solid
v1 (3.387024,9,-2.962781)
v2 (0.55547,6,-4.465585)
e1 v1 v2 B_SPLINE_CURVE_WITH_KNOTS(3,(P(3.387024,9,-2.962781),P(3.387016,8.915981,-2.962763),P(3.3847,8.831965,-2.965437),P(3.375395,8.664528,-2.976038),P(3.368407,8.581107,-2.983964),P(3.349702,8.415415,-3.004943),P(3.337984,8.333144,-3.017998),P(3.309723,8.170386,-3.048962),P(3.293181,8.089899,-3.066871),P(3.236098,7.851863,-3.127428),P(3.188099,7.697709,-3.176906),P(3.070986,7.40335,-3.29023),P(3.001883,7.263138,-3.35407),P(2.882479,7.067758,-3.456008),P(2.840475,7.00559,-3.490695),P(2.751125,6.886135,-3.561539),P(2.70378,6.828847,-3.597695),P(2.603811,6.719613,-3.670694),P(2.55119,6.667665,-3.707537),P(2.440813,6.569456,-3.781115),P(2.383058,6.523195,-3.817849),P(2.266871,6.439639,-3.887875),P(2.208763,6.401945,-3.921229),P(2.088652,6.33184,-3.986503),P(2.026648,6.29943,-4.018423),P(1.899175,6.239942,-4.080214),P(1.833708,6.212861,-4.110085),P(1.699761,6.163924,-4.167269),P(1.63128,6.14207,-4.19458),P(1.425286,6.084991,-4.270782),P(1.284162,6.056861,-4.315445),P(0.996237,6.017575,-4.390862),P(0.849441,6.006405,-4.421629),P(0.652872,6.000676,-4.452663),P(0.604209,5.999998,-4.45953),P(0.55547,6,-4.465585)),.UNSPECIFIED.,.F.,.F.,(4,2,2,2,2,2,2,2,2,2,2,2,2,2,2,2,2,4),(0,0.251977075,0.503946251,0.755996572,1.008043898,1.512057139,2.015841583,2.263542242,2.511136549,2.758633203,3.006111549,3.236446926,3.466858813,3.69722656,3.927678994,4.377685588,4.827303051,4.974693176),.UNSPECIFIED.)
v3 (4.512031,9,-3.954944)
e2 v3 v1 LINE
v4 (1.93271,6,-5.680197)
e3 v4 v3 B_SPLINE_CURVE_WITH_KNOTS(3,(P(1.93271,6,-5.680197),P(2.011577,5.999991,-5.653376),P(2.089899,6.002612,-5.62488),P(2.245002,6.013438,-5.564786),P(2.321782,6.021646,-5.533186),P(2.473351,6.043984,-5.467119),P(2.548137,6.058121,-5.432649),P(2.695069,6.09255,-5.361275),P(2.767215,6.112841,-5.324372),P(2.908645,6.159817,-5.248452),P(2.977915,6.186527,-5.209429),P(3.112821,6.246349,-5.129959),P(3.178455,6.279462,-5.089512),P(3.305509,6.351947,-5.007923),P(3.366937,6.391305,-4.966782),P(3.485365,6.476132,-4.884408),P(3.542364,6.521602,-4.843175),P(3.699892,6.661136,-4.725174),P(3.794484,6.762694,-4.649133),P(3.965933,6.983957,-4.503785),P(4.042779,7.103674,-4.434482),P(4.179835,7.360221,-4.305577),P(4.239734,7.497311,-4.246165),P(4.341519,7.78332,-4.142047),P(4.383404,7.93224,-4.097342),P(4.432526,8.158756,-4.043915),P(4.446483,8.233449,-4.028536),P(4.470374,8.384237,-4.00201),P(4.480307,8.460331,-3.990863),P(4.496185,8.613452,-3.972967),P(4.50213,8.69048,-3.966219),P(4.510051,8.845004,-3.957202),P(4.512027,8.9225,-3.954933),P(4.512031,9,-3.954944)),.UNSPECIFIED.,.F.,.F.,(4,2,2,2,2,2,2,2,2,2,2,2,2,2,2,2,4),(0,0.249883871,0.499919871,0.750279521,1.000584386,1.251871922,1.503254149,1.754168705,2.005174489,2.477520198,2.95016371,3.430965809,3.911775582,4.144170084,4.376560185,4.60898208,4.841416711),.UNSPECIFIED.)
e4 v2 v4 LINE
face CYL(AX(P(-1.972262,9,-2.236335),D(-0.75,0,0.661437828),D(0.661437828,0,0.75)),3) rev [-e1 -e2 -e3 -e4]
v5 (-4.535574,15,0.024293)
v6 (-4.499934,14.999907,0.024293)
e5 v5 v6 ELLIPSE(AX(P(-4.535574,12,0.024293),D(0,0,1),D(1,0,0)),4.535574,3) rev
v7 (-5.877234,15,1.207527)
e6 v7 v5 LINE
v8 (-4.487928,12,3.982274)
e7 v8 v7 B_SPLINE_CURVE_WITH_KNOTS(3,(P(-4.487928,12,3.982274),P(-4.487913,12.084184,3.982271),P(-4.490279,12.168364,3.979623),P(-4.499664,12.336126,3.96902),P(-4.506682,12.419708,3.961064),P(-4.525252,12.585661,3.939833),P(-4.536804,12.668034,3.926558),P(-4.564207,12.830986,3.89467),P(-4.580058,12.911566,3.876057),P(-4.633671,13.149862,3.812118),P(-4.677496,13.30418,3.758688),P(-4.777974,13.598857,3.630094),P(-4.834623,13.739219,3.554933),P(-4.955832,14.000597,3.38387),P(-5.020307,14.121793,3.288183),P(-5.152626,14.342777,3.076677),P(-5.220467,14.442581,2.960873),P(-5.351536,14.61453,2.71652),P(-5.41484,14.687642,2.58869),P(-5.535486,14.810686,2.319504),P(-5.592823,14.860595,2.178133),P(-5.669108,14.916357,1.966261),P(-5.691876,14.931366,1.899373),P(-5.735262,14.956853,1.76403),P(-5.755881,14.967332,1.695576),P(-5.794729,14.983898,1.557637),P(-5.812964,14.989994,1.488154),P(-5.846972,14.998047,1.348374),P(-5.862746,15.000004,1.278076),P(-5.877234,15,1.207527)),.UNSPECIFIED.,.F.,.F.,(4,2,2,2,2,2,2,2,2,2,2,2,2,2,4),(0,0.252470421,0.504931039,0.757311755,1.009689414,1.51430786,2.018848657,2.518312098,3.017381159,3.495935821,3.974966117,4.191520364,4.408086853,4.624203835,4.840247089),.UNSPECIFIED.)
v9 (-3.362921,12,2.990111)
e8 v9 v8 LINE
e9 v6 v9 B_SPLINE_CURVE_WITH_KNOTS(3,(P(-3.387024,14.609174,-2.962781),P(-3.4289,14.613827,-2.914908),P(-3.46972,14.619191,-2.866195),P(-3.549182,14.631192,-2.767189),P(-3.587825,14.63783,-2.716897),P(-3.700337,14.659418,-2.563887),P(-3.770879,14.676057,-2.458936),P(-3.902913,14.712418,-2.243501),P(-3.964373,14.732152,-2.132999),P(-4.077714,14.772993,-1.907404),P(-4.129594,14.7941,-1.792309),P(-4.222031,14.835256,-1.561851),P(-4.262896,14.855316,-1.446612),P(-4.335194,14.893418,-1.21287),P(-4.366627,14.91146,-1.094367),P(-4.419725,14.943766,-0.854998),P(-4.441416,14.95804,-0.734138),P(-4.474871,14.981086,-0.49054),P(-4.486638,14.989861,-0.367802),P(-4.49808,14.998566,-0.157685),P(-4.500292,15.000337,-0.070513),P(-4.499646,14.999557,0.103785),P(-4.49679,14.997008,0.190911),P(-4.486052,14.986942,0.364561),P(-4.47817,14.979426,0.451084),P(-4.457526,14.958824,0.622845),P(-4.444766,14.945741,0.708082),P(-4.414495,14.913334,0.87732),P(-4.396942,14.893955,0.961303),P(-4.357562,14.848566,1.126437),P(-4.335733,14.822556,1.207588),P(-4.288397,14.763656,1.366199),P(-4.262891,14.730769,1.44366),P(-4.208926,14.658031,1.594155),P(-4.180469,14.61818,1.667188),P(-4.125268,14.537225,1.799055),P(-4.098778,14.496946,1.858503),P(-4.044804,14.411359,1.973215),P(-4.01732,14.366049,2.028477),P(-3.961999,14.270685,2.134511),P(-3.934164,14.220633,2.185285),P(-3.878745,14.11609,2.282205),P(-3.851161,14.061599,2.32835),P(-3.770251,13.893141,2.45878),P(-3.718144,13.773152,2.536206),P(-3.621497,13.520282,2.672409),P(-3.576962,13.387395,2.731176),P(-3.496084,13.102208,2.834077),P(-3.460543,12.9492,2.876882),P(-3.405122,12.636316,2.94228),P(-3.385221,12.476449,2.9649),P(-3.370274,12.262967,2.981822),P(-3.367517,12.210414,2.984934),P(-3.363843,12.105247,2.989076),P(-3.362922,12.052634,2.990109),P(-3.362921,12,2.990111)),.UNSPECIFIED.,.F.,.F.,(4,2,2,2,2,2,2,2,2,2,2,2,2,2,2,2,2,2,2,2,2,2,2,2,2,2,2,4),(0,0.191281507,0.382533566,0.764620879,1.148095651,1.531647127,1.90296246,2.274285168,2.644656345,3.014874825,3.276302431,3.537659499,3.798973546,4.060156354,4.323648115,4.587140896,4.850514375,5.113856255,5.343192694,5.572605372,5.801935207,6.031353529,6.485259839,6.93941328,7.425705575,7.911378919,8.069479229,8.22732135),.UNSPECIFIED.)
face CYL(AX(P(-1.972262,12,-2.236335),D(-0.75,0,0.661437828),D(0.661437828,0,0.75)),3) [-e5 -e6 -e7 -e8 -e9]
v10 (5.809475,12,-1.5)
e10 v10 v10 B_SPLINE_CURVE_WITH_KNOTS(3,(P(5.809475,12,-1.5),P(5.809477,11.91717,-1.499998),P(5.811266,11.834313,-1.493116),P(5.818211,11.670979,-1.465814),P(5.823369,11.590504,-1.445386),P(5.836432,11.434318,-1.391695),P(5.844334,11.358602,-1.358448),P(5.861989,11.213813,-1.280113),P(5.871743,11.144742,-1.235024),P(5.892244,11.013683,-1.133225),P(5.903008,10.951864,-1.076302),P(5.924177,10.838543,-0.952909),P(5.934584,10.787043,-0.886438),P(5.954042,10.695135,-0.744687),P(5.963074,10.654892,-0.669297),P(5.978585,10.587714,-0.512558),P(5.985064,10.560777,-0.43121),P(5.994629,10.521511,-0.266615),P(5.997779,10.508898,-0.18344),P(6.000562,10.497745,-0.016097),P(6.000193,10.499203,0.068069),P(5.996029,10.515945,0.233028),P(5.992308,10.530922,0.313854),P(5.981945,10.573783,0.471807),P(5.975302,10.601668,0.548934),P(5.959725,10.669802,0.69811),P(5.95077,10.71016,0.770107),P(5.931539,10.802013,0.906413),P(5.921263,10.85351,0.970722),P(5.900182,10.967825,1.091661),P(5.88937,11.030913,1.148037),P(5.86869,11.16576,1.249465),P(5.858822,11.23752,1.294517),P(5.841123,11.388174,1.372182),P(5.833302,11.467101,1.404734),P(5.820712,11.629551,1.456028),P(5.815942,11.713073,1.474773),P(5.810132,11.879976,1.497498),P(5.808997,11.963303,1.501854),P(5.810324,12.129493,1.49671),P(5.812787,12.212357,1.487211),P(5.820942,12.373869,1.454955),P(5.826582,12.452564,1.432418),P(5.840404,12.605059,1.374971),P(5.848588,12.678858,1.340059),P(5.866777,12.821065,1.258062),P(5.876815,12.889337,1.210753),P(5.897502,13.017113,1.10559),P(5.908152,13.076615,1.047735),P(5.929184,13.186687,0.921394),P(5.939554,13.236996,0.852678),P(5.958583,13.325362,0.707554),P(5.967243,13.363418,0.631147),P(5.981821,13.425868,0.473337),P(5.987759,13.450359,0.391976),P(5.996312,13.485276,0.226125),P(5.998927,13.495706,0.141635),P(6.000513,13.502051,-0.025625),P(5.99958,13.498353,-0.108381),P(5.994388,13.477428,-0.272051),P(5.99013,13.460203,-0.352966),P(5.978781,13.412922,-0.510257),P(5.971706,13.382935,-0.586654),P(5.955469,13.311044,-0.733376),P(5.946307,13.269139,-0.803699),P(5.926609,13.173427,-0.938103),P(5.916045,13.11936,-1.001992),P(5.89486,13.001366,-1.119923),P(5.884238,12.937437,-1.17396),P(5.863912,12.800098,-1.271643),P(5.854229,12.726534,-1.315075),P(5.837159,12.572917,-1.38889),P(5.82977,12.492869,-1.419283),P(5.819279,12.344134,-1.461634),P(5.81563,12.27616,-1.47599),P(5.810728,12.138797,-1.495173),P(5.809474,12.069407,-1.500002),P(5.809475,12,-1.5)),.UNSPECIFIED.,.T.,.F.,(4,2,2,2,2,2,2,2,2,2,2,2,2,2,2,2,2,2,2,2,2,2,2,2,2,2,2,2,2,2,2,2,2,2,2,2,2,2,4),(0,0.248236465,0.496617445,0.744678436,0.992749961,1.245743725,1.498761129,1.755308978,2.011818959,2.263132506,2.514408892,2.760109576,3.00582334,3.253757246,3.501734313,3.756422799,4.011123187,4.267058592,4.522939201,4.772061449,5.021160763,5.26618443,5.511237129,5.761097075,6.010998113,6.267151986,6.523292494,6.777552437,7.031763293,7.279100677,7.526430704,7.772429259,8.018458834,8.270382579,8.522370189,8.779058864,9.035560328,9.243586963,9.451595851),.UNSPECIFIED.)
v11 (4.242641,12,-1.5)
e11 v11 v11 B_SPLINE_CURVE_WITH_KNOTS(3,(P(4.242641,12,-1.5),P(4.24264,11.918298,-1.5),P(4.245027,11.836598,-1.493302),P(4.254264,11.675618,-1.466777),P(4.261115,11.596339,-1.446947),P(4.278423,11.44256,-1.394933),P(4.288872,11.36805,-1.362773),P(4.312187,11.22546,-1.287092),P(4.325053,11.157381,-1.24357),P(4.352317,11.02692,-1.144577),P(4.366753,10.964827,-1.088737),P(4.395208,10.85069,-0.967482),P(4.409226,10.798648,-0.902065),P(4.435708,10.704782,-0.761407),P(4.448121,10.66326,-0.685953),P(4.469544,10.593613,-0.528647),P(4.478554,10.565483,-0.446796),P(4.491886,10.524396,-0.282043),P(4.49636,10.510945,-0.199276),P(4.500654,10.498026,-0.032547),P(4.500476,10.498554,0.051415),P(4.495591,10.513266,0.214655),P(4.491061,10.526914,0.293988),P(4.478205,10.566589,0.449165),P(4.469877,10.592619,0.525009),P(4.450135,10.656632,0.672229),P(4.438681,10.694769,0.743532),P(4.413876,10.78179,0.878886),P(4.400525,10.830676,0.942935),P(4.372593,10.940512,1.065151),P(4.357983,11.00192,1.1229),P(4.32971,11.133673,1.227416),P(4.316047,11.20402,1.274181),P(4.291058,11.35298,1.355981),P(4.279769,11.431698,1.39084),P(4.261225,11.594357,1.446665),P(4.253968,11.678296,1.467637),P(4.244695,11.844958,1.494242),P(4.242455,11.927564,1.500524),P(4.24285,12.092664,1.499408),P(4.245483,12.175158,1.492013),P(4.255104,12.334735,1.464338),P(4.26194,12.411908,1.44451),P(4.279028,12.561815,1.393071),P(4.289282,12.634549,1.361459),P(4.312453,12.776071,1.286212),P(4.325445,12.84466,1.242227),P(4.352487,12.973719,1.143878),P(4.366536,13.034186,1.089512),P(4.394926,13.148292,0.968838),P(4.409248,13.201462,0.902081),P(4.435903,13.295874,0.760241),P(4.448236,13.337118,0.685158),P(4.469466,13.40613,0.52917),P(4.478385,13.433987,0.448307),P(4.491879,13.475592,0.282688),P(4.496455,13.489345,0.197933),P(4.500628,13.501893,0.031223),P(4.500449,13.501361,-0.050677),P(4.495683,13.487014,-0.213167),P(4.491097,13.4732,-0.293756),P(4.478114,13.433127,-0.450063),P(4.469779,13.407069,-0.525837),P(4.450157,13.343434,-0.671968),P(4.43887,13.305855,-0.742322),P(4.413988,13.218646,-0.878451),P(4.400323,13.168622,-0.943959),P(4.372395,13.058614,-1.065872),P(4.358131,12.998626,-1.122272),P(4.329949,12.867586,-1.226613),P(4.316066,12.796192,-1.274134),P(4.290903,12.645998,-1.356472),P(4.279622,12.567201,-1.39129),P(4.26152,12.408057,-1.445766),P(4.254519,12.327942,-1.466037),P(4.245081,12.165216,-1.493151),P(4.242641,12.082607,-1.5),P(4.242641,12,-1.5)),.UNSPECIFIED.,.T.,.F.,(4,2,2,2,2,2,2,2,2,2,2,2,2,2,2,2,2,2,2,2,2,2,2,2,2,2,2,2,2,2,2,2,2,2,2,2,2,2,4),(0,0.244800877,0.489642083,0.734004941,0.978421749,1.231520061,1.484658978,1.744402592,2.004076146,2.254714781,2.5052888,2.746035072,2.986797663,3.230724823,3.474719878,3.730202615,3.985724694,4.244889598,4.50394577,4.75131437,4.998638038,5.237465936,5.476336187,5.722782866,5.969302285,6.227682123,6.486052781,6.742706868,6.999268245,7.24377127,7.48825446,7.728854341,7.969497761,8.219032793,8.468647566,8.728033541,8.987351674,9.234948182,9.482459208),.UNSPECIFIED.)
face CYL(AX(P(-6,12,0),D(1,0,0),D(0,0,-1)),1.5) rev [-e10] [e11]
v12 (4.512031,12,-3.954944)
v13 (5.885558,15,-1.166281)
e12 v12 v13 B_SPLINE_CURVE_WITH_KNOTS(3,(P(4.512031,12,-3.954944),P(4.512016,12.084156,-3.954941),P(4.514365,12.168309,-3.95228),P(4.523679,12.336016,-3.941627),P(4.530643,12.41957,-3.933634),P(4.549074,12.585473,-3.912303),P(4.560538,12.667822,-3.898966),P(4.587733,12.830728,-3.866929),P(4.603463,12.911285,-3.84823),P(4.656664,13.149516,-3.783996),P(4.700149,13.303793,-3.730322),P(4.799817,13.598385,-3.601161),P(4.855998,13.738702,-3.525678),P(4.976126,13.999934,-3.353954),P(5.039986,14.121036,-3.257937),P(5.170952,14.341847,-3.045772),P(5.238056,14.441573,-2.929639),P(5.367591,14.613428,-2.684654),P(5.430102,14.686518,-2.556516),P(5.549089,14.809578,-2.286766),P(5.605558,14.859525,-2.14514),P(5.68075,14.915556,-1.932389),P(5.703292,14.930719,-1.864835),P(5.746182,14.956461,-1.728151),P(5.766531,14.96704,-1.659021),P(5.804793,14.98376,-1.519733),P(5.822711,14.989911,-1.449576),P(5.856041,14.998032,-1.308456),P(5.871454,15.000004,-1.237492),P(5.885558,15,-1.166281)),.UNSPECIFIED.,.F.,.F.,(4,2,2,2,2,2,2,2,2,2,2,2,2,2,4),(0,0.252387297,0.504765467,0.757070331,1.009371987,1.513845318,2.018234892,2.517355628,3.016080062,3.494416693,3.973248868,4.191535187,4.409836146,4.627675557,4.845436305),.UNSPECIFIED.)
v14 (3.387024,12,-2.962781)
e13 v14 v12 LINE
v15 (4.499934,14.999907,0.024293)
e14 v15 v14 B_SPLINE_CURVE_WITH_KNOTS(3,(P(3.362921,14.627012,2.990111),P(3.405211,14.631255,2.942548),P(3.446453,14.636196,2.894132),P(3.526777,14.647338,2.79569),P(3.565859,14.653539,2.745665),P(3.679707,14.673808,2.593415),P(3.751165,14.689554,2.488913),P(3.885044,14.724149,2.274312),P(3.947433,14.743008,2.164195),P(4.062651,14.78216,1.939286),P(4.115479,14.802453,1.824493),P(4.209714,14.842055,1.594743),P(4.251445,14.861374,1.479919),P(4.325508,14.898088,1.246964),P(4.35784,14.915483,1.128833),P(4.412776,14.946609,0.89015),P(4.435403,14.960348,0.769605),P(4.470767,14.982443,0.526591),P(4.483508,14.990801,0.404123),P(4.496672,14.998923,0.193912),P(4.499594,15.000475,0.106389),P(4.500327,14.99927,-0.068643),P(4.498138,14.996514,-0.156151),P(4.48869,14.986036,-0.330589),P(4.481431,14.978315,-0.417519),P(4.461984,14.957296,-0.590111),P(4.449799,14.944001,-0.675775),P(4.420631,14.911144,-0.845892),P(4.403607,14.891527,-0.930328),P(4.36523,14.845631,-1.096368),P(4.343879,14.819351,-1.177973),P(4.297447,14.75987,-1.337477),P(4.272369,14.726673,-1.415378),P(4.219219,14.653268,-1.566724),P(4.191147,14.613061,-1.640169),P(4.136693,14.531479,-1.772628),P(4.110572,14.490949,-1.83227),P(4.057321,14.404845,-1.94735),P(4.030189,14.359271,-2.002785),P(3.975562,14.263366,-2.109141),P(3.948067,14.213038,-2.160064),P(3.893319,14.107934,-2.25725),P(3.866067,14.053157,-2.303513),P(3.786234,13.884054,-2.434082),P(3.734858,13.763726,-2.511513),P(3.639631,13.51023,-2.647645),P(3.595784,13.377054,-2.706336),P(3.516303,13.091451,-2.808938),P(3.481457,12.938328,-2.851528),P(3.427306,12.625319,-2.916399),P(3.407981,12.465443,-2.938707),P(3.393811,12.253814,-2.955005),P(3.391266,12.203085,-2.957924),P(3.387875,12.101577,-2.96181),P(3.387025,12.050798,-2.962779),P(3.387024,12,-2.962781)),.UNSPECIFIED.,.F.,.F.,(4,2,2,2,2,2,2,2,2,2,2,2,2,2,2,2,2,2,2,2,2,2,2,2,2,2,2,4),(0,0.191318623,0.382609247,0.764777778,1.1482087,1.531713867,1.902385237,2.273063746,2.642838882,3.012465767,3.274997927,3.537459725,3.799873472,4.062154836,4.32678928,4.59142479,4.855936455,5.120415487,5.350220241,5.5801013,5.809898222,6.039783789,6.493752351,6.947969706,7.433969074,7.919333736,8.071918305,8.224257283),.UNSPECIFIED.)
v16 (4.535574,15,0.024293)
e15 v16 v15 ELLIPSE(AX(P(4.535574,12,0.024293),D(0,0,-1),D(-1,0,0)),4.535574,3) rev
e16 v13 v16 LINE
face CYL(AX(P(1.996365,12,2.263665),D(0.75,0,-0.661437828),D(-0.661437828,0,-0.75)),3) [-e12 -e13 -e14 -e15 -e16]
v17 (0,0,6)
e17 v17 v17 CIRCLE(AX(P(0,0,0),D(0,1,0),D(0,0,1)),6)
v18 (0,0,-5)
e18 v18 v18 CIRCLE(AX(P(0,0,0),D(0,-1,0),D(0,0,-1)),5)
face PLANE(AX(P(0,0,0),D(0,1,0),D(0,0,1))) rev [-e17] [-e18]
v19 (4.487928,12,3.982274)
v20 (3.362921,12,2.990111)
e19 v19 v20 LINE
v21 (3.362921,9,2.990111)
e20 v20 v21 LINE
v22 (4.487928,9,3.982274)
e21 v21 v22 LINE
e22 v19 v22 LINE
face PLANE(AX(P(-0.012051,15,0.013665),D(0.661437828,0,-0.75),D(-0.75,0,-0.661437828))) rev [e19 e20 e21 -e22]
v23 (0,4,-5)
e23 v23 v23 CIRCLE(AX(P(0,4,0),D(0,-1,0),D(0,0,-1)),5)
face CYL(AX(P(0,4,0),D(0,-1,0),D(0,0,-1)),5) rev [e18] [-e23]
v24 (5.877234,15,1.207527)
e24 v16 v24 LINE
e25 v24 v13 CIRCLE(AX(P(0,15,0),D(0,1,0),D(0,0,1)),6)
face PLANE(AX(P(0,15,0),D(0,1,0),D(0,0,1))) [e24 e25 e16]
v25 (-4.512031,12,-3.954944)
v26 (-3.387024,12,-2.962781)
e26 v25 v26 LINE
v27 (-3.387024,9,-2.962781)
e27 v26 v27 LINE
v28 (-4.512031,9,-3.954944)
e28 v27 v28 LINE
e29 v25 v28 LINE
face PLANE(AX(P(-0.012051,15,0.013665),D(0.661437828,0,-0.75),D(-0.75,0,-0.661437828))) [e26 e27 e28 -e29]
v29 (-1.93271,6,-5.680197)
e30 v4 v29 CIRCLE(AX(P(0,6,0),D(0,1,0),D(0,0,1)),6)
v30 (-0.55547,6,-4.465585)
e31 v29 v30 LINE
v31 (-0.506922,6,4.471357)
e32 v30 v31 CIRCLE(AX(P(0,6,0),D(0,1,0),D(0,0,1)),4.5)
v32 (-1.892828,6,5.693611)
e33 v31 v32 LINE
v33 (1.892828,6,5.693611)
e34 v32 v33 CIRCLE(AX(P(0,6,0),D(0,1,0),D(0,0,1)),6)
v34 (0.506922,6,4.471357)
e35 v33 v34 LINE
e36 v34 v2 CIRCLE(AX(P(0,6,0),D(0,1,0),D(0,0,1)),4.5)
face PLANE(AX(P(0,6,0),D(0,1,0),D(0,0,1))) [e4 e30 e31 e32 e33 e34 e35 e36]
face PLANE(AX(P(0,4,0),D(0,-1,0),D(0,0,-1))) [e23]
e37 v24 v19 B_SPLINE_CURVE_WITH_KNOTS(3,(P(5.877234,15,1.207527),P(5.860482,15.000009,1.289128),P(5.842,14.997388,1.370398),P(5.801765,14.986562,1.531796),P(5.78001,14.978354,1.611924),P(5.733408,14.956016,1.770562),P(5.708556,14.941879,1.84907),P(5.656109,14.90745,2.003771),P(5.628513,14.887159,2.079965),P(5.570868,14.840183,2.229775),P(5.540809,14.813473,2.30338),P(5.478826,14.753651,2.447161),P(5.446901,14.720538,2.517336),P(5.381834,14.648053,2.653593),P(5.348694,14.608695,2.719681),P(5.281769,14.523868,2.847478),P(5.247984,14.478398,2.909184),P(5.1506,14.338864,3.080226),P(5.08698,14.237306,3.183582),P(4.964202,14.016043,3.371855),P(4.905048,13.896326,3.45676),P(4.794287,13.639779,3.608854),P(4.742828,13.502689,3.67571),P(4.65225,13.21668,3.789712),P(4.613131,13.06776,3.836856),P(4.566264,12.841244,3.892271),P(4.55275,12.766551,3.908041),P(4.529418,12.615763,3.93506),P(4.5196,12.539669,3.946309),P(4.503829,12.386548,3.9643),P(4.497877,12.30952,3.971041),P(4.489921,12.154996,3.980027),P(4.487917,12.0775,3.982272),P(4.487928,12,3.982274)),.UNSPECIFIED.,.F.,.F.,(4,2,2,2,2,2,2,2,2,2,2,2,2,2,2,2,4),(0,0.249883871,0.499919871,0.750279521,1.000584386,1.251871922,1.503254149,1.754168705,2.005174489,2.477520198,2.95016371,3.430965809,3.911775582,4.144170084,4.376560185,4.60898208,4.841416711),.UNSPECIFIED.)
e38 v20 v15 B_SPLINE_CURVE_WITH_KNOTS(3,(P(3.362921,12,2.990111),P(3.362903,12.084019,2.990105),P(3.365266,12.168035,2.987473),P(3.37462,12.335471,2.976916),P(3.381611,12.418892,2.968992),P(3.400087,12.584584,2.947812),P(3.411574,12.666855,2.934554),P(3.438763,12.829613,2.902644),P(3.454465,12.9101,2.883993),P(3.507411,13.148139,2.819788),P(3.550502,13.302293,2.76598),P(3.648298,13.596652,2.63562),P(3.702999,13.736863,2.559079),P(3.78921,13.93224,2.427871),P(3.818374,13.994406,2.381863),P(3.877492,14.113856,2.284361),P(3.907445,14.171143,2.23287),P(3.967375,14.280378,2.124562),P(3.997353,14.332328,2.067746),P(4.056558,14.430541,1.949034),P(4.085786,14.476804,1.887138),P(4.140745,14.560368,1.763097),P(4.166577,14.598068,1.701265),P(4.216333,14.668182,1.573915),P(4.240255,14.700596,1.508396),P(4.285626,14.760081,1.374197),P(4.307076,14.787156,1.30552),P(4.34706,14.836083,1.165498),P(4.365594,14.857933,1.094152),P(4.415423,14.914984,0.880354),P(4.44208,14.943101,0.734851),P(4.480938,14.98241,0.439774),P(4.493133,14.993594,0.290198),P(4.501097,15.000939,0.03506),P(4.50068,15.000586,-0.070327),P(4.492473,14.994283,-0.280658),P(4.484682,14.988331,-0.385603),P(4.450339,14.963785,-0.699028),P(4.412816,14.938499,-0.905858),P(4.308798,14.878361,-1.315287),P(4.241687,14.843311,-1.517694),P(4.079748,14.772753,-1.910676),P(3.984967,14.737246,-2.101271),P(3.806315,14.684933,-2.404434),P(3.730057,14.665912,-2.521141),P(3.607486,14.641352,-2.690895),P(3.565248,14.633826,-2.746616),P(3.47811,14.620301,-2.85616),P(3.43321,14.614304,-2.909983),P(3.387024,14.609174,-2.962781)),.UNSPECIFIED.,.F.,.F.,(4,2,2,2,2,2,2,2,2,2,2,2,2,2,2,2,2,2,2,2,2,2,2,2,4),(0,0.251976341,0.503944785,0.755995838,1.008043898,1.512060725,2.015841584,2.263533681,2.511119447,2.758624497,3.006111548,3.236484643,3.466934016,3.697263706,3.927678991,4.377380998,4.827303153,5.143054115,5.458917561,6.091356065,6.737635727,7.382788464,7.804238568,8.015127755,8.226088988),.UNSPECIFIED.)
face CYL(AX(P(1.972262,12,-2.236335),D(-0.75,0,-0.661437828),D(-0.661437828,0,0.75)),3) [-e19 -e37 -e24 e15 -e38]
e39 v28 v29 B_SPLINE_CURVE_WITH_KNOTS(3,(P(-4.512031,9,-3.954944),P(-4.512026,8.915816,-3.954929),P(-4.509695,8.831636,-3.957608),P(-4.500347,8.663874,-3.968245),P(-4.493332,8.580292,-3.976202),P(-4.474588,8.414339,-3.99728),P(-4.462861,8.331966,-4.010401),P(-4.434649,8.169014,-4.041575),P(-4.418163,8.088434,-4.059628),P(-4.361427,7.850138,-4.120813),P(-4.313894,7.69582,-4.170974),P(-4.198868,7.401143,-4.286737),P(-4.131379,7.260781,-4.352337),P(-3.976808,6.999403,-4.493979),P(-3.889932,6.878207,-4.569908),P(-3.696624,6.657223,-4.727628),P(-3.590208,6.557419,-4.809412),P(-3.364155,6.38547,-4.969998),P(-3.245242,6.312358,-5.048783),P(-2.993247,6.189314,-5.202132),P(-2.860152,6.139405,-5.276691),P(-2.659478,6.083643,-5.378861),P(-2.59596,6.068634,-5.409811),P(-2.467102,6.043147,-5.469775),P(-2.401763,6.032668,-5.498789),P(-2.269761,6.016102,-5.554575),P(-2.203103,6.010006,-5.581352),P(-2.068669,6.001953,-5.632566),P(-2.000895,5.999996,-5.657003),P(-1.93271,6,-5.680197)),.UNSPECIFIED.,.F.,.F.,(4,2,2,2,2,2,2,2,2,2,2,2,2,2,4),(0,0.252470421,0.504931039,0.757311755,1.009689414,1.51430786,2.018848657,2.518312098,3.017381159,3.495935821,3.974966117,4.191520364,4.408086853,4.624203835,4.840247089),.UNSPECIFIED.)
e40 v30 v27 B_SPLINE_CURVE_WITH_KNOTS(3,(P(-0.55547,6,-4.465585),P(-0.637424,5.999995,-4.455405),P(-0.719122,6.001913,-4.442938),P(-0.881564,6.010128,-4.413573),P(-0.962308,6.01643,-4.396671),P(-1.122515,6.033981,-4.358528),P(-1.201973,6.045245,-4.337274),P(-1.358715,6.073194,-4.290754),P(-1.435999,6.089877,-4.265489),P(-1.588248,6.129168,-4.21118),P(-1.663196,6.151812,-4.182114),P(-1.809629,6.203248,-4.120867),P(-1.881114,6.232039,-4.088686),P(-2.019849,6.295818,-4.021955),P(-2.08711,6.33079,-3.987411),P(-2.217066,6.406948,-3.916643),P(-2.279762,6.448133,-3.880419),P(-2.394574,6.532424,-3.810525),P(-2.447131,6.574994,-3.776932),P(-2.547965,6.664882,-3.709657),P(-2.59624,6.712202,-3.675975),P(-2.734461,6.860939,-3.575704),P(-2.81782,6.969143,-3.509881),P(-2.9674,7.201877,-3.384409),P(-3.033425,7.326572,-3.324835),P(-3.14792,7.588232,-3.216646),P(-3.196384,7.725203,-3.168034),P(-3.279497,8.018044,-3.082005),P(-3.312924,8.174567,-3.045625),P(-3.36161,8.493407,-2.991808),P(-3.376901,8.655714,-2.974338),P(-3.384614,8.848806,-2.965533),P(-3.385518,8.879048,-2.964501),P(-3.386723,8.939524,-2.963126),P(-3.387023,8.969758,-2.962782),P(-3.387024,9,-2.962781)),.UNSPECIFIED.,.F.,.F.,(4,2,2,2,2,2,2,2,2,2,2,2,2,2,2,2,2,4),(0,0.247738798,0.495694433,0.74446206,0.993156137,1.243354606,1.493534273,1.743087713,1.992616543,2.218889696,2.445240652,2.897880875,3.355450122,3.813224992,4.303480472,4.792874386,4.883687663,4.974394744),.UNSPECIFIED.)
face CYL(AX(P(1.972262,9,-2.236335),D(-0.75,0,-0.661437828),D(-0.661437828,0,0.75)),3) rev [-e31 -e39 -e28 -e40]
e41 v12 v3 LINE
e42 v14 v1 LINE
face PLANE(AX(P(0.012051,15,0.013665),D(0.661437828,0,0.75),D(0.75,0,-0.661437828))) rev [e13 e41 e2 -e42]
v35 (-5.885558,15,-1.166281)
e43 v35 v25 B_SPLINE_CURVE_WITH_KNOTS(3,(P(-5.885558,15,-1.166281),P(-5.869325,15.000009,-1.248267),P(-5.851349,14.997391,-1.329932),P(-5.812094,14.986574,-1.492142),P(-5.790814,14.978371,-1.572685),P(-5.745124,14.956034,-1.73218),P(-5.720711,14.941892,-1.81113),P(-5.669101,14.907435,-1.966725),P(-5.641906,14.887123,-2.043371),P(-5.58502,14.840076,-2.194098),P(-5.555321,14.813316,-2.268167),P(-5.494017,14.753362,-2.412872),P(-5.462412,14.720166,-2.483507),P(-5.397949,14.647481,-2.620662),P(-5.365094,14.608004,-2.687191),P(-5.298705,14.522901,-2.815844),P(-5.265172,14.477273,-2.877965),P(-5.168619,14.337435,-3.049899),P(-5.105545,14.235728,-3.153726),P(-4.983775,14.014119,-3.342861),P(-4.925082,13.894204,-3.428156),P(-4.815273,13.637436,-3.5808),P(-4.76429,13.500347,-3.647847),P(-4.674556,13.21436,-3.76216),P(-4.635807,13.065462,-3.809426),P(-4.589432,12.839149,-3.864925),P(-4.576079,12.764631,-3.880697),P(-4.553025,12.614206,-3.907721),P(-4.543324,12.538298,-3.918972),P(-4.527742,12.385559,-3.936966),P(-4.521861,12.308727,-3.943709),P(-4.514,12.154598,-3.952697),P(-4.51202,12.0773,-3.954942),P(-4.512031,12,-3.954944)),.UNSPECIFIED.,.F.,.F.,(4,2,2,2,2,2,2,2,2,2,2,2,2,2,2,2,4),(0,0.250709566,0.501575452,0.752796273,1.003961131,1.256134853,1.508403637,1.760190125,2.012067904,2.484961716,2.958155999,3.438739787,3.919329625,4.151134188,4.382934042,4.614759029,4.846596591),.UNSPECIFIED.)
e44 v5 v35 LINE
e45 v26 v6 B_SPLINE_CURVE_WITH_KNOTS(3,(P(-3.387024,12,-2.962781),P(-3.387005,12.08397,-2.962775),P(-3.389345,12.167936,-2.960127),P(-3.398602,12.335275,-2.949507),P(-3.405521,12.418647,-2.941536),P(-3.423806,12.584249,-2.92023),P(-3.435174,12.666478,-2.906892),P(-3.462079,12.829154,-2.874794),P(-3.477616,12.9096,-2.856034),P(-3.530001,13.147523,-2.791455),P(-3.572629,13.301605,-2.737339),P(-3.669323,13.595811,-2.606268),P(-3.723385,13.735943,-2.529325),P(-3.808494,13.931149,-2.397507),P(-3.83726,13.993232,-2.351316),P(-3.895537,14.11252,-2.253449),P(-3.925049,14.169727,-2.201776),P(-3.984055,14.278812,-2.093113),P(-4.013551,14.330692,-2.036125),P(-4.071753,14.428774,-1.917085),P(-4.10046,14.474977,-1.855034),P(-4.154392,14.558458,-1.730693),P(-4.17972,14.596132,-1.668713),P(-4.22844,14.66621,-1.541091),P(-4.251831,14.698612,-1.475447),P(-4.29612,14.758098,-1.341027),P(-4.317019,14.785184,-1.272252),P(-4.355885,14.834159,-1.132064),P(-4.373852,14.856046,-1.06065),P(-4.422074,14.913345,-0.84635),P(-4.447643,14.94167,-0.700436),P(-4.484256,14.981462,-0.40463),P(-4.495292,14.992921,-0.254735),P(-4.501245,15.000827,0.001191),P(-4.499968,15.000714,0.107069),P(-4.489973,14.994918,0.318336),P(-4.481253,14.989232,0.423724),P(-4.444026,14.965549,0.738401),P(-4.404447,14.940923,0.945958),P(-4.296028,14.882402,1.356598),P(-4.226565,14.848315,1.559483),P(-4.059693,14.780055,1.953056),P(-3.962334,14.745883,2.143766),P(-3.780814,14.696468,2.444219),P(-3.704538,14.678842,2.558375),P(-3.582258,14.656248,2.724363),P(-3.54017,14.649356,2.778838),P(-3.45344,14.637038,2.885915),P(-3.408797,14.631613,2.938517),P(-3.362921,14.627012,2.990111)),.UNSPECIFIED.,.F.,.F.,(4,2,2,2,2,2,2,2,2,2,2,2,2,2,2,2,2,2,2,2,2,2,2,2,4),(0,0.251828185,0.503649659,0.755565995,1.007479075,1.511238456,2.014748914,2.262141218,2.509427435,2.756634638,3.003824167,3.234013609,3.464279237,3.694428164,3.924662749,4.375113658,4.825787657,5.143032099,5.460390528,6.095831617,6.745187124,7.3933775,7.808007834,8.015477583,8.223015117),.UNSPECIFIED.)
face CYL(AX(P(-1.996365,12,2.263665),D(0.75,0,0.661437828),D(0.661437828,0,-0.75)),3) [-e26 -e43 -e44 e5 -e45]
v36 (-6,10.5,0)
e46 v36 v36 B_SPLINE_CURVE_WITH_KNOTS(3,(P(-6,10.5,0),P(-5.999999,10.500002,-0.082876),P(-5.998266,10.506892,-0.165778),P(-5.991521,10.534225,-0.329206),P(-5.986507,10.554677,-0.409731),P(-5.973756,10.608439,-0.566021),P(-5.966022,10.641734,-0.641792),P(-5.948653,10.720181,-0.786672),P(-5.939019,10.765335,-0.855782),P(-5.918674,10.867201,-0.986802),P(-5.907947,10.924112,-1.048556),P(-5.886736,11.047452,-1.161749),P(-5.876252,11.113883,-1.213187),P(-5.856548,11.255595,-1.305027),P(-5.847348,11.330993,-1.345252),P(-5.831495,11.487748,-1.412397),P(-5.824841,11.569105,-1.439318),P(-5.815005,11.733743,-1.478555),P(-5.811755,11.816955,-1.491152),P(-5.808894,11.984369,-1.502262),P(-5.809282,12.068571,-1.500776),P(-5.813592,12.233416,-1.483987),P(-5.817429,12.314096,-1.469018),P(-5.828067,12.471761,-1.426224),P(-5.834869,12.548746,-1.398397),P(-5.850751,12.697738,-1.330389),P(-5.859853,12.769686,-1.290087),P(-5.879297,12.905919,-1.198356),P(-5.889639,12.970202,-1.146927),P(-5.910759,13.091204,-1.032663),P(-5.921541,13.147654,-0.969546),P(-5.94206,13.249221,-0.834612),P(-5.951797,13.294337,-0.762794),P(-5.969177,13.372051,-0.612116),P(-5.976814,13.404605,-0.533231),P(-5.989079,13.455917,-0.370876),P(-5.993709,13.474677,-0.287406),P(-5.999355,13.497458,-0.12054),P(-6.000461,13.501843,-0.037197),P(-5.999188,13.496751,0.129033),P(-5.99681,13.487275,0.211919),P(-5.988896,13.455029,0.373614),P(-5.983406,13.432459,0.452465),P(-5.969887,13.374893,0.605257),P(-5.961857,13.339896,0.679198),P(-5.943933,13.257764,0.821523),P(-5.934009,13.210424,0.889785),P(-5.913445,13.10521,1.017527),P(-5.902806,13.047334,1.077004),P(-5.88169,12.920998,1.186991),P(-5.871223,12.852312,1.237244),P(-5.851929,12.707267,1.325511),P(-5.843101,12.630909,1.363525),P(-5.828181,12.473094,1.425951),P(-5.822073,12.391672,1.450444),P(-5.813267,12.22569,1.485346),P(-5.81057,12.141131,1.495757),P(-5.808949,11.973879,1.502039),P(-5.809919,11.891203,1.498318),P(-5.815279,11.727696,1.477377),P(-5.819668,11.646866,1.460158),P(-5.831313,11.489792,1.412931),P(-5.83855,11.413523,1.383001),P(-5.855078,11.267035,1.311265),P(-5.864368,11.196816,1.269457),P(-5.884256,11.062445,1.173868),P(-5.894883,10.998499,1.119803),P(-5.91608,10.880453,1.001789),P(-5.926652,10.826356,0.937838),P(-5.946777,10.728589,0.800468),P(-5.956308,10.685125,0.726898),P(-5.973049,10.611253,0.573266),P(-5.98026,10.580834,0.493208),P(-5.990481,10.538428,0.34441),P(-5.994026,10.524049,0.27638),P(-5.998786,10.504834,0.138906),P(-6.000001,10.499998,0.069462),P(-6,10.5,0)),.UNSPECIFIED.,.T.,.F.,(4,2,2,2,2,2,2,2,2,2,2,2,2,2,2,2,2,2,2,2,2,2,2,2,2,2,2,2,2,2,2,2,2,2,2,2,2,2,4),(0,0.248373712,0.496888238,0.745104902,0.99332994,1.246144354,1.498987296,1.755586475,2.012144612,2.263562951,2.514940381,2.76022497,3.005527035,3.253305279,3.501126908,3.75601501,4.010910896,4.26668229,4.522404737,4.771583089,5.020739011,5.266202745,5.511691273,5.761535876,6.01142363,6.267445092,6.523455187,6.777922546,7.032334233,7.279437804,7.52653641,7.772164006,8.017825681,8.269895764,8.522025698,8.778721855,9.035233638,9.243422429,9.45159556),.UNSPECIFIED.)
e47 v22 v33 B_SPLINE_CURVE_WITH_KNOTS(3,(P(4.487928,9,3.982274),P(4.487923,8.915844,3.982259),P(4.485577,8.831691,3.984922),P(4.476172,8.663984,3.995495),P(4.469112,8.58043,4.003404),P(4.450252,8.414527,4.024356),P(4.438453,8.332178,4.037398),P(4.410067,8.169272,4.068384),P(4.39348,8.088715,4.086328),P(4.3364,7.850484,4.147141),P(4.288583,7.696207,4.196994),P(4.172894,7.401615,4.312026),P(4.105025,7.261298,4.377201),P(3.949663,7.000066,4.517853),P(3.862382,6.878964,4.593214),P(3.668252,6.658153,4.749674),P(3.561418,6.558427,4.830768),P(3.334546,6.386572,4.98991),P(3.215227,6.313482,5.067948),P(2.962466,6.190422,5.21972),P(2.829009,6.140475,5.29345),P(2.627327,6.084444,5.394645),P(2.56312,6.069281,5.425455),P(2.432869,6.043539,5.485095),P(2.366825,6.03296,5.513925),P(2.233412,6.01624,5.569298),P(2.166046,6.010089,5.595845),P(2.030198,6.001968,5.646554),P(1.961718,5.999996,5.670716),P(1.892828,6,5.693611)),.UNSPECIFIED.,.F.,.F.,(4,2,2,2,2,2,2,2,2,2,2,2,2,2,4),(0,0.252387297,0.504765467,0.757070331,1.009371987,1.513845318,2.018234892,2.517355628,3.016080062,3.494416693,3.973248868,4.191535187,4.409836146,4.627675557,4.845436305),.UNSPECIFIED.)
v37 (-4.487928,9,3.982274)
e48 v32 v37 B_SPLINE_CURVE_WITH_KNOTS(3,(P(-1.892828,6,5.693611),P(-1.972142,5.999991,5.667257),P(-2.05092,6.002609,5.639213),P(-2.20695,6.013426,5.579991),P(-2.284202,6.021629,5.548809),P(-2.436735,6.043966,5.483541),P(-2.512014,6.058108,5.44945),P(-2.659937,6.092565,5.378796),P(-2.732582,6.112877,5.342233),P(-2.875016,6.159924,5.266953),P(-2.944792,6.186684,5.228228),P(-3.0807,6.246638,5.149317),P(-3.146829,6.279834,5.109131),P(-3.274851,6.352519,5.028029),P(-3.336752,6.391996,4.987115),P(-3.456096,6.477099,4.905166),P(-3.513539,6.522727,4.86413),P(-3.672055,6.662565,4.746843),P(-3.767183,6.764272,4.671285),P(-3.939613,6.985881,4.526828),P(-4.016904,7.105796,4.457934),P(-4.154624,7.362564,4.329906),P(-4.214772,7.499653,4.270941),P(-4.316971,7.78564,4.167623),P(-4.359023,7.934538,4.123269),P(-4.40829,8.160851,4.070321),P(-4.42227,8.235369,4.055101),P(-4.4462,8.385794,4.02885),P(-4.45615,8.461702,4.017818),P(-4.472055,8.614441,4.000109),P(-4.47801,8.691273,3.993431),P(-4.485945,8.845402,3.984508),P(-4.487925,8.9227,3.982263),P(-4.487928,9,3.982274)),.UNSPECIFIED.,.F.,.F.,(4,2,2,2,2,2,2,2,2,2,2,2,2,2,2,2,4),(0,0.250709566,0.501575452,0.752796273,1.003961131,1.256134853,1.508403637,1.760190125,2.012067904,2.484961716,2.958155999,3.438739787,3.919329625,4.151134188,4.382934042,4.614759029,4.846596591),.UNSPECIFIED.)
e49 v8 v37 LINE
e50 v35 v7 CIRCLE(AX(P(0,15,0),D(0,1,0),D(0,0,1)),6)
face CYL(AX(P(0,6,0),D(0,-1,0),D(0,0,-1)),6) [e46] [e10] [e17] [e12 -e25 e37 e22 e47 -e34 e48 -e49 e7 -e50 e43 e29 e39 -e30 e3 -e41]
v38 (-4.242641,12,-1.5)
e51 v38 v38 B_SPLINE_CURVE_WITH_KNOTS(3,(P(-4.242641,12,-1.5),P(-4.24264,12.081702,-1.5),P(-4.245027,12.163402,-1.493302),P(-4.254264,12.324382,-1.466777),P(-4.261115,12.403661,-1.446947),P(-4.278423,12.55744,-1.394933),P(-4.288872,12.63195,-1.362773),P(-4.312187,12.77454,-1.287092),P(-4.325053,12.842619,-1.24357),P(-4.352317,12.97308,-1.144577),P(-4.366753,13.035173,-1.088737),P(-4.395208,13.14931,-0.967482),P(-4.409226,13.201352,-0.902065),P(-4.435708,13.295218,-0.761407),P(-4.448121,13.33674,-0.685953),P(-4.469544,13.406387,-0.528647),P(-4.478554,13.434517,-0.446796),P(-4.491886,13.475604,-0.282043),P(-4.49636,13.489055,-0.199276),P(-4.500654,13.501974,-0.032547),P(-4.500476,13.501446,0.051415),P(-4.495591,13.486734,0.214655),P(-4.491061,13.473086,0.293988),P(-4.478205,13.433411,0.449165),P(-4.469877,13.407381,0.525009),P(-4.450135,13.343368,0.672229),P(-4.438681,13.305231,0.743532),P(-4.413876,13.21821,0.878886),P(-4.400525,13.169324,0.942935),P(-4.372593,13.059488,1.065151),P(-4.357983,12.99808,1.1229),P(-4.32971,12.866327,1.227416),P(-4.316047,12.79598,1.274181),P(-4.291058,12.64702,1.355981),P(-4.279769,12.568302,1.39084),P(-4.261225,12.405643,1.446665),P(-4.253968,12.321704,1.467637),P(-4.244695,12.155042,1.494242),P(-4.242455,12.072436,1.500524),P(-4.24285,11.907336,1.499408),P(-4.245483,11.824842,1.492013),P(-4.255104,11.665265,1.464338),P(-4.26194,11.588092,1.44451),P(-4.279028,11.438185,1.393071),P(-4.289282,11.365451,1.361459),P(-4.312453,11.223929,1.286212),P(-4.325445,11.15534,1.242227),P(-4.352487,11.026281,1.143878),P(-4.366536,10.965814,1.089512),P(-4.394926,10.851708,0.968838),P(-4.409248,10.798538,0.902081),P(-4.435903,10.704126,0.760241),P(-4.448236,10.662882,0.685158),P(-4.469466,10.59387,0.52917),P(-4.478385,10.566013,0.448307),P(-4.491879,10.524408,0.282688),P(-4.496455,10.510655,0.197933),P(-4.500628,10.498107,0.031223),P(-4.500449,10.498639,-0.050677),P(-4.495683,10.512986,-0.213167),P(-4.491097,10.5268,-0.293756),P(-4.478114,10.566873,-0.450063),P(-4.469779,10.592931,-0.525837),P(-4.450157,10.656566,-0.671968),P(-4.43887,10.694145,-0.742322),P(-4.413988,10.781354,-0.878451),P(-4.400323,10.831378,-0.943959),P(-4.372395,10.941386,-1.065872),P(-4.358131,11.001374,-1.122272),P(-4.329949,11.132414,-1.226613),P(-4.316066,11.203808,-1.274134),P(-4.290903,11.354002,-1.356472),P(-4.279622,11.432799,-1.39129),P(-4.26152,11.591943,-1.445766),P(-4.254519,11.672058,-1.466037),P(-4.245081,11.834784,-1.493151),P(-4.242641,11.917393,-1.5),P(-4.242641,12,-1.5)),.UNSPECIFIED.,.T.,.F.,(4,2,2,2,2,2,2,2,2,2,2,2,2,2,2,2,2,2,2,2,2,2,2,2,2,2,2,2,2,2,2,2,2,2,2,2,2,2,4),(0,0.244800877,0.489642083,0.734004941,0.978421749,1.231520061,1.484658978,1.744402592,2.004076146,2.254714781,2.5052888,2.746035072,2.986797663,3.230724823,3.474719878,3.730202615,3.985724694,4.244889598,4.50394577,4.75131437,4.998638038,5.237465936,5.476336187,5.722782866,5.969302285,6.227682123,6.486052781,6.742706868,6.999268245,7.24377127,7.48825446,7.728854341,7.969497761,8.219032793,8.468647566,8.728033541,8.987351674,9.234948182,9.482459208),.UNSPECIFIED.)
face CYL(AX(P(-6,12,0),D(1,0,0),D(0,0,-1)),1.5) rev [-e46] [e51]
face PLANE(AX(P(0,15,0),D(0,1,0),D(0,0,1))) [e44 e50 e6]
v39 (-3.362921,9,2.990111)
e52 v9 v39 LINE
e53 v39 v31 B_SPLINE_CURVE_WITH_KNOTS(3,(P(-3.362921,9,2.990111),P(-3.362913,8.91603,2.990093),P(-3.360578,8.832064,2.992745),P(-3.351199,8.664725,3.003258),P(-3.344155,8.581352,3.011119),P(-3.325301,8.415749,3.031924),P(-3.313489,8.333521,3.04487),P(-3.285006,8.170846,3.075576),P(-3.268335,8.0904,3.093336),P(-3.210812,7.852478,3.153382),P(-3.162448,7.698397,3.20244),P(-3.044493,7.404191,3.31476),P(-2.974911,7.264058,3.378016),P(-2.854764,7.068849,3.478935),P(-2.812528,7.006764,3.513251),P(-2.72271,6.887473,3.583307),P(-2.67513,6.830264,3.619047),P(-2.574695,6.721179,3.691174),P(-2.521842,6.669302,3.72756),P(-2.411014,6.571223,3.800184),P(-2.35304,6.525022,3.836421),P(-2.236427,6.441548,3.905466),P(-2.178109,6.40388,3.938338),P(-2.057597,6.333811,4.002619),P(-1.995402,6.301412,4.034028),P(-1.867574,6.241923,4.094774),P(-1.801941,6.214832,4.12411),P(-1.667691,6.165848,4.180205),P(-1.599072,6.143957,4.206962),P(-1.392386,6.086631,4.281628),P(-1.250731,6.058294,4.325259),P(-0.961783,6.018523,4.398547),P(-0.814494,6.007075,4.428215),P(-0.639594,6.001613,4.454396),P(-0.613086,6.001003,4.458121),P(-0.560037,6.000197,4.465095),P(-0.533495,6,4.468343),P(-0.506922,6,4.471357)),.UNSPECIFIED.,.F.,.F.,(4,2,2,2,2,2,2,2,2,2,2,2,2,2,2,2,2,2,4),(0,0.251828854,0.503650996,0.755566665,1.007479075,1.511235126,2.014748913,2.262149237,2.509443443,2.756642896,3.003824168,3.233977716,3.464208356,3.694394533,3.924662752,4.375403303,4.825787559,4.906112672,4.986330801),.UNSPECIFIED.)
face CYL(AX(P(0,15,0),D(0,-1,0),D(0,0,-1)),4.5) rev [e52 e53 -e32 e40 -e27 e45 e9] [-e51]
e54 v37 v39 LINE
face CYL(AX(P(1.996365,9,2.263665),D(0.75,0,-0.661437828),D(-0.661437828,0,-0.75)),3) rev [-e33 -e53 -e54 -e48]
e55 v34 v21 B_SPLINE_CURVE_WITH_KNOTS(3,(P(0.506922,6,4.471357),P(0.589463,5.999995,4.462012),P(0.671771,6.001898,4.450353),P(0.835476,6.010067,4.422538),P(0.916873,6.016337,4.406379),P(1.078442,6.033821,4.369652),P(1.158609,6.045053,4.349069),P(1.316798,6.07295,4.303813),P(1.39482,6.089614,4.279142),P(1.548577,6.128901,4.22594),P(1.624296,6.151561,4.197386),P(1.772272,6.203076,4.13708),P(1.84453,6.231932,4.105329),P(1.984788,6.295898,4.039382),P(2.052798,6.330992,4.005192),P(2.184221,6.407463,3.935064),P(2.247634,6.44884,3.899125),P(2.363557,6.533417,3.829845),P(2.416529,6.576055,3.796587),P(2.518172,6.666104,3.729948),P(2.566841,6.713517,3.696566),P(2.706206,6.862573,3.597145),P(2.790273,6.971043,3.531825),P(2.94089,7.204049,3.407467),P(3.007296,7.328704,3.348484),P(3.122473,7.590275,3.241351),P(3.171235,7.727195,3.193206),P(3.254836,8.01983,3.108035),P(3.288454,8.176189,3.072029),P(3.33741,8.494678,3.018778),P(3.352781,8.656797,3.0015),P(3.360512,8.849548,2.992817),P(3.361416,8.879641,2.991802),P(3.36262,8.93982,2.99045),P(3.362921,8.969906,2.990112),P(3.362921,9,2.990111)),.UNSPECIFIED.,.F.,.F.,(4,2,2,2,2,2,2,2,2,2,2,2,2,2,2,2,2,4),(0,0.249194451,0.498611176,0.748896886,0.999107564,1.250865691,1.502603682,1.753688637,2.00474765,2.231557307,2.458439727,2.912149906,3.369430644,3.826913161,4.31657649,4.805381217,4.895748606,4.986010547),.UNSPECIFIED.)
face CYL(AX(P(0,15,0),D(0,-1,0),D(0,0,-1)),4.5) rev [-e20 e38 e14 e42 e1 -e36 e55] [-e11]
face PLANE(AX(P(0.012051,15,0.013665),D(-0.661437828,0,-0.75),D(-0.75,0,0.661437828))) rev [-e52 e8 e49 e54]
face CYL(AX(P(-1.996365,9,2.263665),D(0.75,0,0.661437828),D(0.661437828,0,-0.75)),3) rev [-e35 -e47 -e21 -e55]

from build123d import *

# Parameters (mm, degrees)
SKETCH1_R               = 6
BOSS_EXTRUDE1_DEPTH     = 6
BOSS_EXTRUDE2_DEPTH     = 9
FILLET1_R               = 3
FILLET2_R               = 3
CUT_EXTRUDE2_DEPTH      = 18.233688096
CUT_EXTRUDE2_DEPTH_BACK = 18.233688096
SKETCH4_R               = 1.5
SKETCH5_R               = 5
CUT_EXTRUDE3_DEPTH      = 4


with BuildPart() as part:
    # Sketch1 → Boss-Extrude1 (new body)
    with BuildSketch(Plane(origin=(0, 0, 0), x_dir=(1, 0, 0), z_dir=(0, 1, 0))):
        with Locations(Location((0, 0, 0), (0, 0, 270))):
            Circle(SKETCH1_R)
    extrude(amount=BOSS_EXTRUDE1_DEPTH)

    # Sketch3 → Boss-Extrude2 (add)
    with BuildSketch(Plane(origin=(0, 6, 0), x_dir=(1, 0, 0), z_dir=(0, 1, 0))):
        with BuildLine():
            ThreePointArc((-4.512030676, 3.954943638), (-5.999972336, -0.01822004), (-4.487927828, -3.982273699))
            Line((-4.487927828, -3.982273699), (-3.362920912, -2.990110858))
            ThreePointArc((-3.362920912, -2.990110858), (-4.499963114, -0.01822004), (-3.38702376, 2.962780797))
            Line((-3.38702376, 2.962780797), (-4.512030676, 3.954943638))
        make_face()
        with BuildLine():
            Line((3.362920912, -2.990110858), (4.487927828, -3.982273699))
            ThreePointArc((4.487927828, -3.982273699), (5.609258729, -2.129839552), (6, 0))
            ThreePointArc((6, 0), (5.615700493, 2.112796245), (4.512030676, 3.954943638))
            Line((4.512030676, 3.954943638), (3.38702376, 2.962780797))
            ThreePointArc((3.38702376, 2.962780797), (4.499963114, -0.01822004), (3.362920912, -2.990110858))
        make_face()
    extrude(amount=BOSS_EXTRUDE2_DEPTH)

    # Fillet1
    # the kernel refuses this fillet: 3 mm, written as the material it takes off along each edge
    with BuildSketch(Plane(origin=(-2.262079088, 15, -1.970672851), x_dir=(0, -1, 0), z_dir=(0.7499999999999997, 0, 0.661437827766148)), Plane(origin=(10.137030676, 15, -8.915727346), x_dir=(0, -1, 0), z_dir=(-0.7499999999999997, 0, 0.661437827766148)), Plane(origin=(2.23797624, 15, 1.998002911), x_dir=(0, -1, 0), z_dir=(-0.7499999999999997, 0, -0.661437827766148)), Plane(origin=(-10.112927828, 15, 8.943057407), x_dir=(0, -1, 0), z_dir=(0.7499999999999997, 0, -0.661437827766148))) as fillet1_piece_1:
        with BuildLine():
            CenterArc((FILLET1_R, FILLET1_R), FILLET1_R, 180, 90)
            Line((0, FILLET1_R), (0, 0))
            Line((0, 0), (FILLET1_R, 0))
        make_face()
    extrude(amount=16.500009221, mode=Mode.SUBTRACT)

    # Fillet2
    # the kernel refuses this fillet: 3 mm, written as the material it adds along each edge
    with BuildSketch(Plane(origin=(-2.262079088, 6, -1.970672851), x_dir=(-0.661437827766148, 0, 0.7499999999999997), z_dir=(0.7499999999999997, 0, 0.661437827766148))) as fillet2_piece_1_section:
        with BuildLine():
            CenterArc((FILLET2_R, -FILLET2_R), FILLET2_R, 90, 90)
            Line((0, -FILLET2_R), (0, 0))
            Line((0, 0), (FILLET2_R, 0))
        make_face()
    fillet2_piece_1 = extrude(amount=16.500009221, mode=Mode.PRIVATE)
    fillet2_piece_1 = fillet2_piece_1 & Plane(origin=(0, 6.66993204, 0), x_dir=(0, 0, 1), z_dir=(0, -1, 0)) * Cylinder(6, 46, mode=Mode.PRIVATE)
    fillet2_piece_1 = fillet2_piece_1 - Plane(origin=(0, 6.66993204, 0), x_dir=(0.7526719465807102, 0, -0.6583957326945586), z_dir=(0, -1, 0)) * Cylinder(4.5, 46, mode=Mode.PRIVATE)
    add(fillet2_piece_1)
    with BuildSketch(Plane(origin=(10.137030676, 6, -8.915727346), x_dir=(-0.661437827766148, 0, -0.7499999999999998), z_dir=(-0.7499999999999997, 0, 0.661437827766148))) as fillet2_piece_2_section:
        with BuildLine():
            CenterArc((FILLET2_R, -FILLET2_R), FILLET2_R, 90, 90)
            Line((0, -FILLET2_R), (0, 0))
            Line((0, 0), (FILLET2_R, 0))
        make_face()
    fillet2_piece_2 = extrude(amount=16.500009221, mode=Mode.PRIVATE)
    fillet2_piece_2 = fillet2_piece_2 & Plane(origin=(0, 6.67033371, 0), x_dir=(0, 0, 1), z_dir=(0, -1, 0)) * Cylinder(6, 46, mode=Mode.PRIVATE)
    fillet2_piece_2 = fillet2_piece_2 - Plane(origin=(0, 6.67033371, 0), x_dir=(0.7526719465807102, 0, -0.6583957326945586), z_dir=(0, -1, 0)) * Cylinder(4.5, 46, mode=Mode.PRIVATE)
    add(fillet2_piece_2)
    with BuildSketch(Plane(origin=(-10.112927828, 6, 8.943057407), x_dir=(0.661437827766148, 0, 0.7499999999999998), z_dir=(0.7499999999999997, 0, -0.661437827766148))) as fillet2_piece_3_section:
        with BuildLine():
            CenterArc((FILLET2_R, -FILLET2_R), FILLET2_R, 90, 90)
            Line((0, -FILLET2_R), (0, 0))
            Line((0, 0), (FILLET2_R, 0))
        make_face()
    fillet2_piece_3 = extrude(amount=16.500009221, mode=Mode.PRIVATE)
    fillet2_piece_3 = fillet2_piece_3 & Plane(origin=(0, 6.669931793, 0), x_dir=(0, 0, 1), z_dir=(0, -1, 0)) * Cylinder(6, 46, mode=Mode.PRIVATE)
    fillet2_piece_3 = fillet2_piece_3 - Plane(origin=(0, 6.669931793, 0), x_dir=(-0.7473157581885724, 0, 0.6644690794634761), z_dir=(0, -1, 0)) * Cylinder(4.5, 46, mode=Mode.PRIVATE)
    add(fillet2_piece_3)
    with BuildSketch(Plane(origin=(2.23797624, 6, 1.998002911), x_dir=(0.661437827766148, 0, -0.7499999999999997), z_dir=(-0.7499999999999997, 0, -0.661437827766148))) as fillet2_piece_4_section:
        with BuildLine():
            CenterArc((FILLET2_R, -FILLET2_R), FILLET2_R, 90, 90)
            Line((0, -FILLET2_R), (0, 0))
            Line((0, 0), (FILLET2_R, 0))
        make_face()
    fillet2_piece_4 = extrude(amount=16.500009221, mode=Mode.PRIVATE)
    fillet2_piece_4 = fillet2_piece_4 & Plane(origin=(0, 6.670333879, 0), x_dir=(0, 0, 1), z_dir=(0, -1, 0)) * Cylinder(6, 46, mode=Mode.PRIVATE)
    fillet2_piece_4 = fillet2_piece_4 - Plane(origin=(0, 6.670333879, 0), x_dir=(-0.7473157581885724, 0, 0.6644690794634761), z_dir=(0, -1, 0)) * Cylinder(4.5, 46, mode=Mode.PRIVATE)
    add(fillet2_piece_4)

    # Sketch4 → Cut-Extrude2 (cut, two sides: drawn at the far end of the back side and taken through both)
    with BuildSketch(Plane(origin=(0, 0, 0), x_dir=(0, 0, -1), z_dir=(1, 0, 0)).offset(-CUT_EXTRUDE2_DEPTH_BACK)):
        with Locations((0, 12)):
            Circle(SKETCH4_R)
    extrude(amount=CUT_EXTRUDE2_DEPTH + CUT_EXTRUDE2_DEPTH_BACK, mode=Mode.SUBTRACT)

    # Sketch5 → Cut-Extrude3 (cut)
    with BuildSketch(Plane.XZ):
        with Locations(Location((0, 0, 0), (0, 0, 270))):
            Circle(SKETCH5_R)
    extrude(amount=-CUT_EXTRUDE3_DEPTH, mode=Mode.SUBTRACT)


solid = part.part
